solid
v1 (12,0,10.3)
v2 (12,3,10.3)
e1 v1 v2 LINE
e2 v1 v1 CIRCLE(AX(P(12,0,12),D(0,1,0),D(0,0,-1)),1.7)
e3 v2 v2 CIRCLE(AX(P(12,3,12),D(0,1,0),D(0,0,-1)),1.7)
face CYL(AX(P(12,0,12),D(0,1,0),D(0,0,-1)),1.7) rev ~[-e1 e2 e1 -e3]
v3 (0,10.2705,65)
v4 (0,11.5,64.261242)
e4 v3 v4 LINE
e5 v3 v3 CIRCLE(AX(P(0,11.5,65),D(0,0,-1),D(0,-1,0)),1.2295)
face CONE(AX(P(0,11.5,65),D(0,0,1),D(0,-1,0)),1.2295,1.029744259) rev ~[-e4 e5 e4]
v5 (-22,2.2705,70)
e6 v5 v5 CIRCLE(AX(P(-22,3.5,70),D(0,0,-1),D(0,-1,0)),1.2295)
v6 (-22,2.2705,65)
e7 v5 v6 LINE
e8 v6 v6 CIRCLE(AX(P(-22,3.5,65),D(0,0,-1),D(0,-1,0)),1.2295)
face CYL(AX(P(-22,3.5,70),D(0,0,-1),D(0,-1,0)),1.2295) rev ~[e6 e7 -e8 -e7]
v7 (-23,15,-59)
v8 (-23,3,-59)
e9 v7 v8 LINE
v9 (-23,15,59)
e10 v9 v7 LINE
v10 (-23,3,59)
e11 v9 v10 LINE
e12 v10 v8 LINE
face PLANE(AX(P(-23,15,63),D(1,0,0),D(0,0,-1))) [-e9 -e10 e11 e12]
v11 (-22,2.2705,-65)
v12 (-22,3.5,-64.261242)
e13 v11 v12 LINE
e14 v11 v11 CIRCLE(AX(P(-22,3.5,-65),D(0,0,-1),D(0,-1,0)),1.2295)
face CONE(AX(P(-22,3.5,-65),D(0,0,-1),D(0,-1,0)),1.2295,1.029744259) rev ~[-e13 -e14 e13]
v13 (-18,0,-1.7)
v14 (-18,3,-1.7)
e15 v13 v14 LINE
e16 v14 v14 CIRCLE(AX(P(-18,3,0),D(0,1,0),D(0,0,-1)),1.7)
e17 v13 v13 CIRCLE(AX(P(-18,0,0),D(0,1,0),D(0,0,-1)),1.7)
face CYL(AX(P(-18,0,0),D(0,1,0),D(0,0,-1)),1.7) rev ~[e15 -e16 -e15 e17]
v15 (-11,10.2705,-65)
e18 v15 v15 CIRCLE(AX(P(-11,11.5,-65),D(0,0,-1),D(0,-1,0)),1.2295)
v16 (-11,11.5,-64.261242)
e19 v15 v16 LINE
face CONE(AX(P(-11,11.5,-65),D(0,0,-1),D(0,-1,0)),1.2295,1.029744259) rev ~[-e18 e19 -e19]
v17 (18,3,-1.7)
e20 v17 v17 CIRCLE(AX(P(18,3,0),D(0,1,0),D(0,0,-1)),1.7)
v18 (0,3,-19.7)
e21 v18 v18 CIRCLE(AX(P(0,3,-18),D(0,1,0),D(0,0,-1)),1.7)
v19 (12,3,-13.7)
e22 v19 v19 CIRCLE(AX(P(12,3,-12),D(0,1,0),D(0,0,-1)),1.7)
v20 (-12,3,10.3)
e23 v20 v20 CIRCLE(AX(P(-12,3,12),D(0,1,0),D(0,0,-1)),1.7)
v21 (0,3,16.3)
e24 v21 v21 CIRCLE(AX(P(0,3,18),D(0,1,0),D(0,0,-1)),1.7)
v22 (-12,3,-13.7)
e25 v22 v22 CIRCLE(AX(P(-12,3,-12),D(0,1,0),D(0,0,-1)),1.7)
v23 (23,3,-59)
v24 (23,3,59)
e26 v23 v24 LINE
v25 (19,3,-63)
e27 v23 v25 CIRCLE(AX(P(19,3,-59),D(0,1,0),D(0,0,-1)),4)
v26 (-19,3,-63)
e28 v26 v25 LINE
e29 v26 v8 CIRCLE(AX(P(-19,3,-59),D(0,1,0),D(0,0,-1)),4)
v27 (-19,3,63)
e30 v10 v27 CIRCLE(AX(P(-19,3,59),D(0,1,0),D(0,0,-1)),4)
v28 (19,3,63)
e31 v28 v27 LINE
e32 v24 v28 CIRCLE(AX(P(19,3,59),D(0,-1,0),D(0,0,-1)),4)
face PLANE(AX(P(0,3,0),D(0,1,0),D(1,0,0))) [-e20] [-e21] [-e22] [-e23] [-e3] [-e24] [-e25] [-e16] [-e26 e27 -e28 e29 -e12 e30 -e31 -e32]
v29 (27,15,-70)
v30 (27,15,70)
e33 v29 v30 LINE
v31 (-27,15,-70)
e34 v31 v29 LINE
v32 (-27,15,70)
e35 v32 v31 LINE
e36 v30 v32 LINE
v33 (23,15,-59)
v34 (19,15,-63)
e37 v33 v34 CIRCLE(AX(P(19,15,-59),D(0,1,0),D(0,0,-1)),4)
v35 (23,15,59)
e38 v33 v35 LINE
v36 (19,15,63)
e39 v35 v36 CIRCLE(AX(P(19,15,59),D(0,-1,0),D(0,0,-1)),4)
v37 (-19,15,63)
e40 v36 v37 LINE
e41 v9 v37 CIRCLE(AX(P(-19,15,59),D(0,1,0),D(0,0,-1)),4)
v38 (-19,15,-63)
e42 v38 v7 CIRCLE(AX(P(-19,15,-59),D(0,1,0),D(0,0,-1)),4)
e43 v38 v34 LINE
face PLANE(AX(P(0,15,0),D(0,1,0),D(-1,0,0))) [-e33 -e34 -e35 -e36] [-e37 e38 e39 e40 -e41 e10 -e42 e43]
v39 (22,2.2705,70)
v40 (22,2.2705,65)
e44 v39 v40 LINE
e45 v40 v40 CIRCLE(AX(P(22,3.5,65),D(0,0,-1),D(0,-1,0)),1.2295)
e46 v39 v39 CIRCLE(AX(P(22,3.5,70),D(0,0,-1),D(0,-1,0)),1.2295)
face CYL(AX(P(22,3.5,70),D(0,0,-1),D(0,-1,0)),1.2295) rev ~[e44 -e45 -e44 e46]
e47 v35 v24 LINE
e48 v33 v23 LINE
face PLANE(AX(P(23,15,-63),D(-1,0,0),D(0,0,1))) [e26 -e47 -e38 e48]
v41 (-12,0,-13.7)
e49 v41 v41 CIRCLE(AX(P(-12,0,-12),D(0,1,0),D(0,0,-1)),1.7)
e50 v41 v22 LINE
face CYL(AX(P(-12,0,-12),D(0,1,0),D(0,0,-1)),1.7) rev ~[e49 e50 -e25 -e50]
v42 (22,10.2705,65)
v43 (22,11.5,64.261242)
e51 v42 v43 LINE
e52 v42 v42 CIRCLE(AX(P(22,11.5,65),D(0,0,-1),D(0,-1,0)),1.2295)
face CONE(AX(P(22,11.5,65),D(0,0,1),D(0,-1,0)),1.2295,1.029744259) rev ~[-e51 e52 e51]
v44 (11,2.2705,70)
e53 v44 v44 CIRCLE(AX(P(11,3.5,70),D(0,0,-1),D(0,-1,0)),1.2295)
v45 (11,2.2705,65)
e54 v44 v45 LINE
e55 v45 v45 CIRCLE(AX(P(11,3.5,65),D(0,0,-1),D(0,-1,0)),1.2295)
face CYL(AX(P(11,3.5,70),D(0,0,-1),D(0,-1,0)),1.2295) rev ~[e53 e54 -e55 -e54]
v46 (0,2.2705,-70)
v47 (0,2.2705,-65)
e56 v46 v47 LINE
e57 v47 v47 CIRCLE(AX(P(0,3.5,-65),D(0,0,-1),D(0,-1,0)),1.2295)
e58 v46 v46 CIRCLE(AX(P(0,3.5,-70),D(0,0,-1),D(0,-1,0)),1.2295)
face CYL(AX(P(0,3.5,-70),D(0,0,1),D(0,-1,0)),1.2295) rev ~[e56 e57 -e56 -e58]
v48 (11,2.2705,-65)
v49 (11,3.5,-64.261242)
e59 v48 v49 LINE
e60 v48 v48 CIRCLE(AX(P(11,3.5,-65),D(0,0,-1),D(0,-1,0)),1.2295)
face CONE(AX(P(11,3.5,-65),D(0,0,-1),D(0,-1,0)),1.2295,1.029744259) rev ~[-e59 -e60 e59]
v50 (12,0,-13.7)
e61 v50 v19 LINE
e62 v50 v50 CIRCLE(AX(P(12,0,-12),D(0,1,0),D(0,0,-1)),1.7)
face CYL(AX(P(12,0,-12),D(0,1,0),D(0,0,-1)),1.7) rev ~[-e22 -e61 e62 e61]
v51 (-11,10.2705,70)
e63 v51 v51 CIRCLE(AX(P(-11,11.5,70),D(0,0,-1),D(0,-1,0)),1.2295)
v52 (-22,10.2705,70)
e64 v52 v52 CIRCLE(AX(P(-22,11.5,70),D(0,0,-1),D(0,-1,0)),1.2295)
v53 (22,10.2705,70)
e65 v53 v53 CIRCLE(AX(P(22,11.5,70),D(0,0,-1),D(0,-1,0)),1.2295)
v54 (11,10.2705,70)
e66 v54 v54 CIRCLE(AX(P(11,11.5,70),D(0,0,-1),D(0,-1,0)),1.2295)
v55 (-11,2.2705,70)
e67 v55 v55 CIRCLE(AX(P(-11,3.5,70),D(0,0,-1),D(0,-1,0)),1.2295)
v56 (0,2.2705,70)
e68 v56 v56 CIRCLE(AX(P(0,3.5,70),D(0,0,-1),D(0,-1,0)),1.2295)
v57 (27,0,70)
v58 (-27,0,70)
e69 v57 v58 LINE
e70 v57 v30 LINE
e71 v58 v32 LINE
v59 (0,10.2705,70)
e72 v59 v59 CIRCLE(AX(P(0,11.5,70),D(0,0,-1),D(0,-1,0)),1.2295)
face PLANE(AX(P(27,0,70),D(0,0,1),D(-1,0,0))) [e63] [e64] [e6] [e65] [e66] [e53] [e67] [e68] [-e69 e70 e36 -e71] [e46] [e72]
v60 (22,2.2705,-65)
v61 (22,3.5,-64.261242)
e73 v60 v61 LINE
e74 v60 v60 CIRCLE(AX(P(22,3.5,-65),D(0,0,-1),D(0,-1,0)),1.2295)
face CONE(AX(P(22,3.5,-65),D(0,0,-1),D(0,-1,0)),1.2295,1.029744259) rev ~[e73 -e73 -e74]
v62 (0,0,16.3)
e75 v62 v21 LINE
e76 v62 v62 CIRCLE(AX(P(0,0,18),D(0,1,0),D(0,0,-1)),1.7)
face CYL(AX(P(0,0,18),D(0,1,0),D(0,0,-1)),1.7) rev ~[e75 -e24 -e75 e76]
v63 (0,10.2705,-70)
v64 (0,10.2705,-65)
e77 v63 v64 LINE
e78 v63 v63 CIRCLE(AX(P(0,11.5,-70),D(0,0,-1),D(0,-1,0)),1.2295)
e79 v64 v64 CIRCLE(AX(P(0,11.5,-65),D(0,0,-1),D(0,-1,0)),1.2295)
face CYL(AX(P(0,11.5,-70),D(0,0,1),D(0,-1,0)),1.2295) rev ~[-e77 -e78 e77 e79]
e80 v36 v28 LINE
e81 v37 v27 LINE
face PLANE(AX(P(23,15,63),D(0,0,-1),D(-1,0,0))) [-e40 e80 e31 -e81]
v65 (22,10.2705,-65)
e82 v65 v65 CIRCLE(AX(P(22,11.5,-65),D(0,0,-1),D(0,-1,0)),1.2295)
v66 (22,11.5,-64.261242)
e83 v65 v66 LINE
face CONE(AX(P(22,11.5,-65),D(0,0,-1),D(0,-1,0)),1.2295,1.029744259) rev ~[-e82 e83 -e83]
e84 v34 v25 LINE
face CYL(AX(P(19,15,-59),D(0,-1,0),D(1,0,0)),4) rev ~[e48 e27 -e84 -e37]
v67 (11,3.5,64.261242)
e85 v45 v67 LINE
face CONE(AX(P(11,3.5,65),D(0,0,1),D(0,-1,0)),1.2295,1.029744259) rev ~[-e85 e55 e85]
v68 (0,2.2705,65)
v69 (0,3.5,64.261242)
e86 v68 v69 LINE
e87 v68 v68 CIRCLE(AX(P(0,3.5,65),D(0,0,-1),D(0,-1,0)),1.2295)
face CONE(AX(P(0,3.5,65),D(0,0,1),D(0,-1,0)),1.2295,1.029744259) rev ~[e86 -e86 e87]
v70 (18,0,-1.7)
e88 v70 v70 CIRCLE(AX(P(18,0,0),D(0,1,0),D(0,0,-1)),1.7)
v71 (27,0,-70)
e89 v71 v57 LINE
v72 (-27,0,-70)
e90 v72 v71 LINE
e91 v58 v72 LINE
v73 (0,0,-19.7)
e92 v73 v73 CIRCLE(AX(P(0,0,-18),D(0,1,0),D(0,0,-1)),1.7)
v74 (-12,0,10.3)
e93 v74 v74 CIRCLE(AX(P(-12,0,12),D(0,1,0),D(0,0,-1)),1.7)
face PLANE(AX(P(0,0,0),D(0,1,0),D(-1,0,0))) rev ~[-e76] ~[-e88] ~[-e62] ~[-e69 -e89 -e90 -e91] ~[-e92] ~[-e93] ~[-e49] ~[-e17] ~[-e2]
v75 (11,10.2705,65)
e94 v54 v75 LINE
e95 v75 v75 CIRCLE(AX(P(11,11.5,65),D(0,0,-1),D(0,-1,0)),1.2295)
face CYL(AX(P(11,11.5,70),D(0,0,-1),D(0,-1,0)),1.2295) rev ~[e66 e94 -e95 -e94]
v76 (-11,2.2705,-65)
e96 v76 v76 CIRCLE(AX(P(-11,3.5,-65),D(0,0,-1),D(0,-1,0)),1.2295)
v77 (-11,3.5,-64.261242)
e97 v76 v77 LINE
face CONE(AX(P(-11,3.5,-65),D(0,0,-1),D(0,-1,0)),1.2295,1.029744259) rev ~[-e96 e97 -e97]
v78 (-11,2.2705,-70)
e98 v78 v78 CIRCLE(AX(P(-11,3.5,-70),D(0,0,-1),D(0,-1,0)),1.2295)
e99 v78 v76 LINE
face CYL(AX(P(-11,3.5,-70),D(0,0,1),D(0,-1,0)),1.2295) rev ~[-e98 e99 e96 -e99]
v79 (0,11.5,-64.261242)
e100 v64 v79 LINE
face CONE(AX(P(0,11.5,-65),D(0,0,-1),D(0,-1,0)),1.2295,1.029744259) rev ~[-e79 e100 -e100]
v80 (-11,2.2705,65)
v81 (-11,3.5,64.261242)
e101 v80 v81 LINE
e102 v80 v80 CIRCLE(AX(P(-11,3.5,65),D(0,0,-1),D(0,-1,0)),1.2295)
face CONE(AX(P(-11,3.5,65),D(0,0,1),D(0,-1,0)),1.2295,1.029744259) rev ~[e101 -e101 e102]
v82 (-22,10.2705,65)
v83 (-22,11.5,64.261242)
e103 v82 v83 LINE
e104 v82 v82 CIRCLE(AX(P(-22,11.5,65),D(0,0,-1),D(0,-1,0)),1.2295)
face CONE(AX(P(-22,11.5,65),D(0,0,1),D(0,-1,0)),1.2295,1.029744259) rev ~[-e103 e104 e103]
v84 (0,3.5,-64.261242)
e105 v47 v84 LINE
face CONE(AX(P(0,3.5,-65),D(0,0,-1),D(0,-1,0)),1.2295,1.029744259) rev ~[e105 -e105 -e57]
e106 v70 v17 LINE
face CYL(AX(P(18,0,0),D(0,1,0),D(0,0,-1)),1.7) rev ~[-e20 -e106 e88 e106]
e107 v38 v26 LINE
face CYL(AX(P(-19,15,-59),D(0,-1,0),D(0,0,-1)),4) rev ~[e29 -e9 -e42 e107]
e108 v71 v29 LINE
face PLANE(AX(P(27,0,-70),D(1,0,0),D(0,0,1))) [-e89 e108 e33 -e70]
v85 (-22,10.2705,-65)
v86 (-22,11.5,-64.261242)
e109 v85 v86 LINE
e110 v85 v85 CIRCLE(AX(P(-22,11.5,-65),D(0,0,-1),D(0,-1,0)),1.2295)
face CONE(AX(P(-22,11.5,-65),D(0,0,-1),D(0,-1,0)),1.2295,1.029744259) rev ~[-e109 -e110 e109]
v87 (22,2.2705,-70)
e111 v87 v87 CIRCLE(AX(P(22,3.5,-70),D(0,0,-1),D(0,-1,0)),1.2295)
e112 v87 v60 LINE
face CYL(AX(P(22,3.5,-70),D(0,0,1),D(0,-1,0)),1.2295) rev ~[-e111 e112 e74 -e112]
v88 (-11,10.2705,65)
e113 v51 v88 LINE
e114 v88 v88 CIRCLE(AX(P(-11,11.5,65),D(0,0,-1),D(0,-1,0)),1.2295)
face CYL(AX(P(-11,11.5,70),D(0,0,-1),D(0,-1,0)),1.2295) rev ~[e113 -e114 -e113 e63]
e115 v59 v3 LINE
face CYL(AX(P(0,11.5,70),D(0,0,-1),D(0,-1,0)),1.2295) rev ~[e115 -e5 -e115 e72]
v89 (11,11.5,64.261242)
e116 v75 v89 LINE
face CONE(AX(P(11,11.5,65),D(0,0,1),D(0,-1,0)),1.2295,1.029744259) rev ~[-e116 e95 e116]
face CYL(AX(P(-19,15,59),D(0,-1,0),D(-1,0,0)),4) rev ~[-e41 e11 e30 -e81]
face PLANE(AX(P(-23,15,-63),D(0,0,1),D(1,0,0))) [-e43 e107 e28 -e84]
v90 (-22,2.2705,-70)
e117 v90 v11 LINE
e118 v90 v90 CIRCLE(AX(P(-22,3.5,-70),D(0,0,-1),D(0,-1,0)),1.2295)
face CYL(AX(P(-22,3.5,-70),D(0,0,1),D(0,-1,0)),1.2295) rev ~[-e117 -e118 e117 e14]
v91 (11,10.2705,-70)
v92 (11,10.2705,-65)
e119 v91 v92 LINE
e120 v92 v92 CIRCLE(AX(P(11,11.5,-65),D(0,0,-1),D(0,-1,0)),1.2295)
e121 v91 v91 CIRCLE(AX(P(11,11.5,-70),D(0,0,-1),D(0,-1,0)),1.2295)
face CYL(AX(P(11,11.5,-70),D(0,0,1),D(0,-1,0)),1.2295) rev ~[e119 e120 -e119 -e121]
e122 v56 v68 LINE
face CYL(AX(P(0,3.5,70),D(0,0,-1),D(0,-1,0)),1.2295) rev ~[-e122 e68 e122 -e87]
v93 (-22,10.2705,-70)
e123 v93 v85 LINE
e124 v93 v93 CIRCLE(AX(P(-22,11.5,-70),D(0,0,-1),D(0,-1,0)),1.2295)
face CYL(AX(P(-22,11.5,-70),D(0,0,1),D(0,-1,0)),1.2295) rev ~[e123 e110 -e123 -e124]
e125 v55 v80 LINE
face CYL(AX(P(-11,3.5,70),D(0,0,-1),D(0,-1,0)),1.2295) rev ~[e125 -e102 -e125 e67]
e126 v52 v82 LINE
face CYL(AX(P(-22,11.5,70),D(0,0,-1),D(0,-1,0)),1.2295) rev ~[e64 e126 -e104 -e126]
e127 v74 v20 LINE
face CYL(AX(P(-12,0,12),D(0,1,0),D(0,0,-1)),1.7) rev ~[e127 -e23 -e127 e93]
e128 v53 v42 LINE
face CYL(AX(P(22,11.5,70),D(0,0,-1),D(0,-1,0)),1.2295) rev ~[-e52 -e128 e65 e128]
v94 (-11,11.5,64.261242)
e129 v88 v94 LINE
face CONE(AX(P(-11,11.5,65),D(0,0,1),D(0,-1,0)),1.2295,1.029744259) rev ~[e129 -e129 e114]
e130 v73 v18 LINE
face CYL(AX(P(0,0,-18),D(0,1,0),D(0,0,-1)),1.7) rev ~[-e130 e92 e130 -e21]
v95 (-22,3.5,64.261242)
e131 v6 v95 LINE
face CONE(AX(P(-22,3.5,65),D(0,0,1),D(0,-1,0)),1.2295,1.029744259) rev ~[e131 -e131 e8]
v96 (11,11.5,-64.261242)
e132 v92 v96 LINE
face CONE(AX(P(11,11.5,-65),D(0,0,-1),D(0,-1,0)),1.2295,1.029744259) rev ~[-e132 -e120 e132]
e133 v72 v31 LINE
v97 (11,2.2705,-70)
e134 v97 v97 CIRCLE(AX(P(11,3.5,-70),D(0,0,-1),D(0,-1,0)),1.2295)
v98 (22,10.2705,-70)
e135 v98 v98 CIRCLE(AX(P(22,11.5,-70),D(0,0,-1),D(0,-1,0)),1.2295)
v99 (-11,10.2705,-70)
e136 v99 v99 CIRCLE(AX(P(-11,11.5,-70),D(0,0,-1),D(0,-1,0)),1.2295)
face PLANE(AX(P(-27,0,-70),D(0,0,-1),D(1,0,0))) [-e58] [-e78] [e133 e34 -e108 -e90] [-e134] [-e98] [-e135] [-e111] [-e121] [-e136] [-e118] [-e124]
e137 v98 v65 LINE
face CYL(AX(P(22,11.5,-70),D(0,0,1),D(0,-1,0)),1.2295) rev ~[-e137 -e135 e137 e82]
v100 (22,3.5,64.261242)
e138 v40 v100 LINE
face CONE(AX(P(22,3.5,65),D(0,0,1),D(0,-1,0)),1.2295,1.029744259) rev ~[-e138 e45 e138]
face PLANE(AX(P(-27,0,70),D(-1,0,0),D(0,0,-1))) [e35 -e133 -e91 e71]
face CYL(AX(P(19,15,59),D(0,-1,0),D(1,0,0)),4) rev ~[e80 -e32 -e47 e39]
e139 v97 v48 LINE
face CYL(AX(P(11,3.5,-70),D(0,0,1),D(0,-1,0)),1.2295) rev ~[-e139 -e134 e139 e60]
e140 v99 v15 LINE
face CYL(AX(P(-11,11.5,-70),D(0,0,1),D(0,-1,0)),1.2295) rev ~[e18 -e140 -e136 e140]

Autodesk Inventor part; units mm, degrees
ref_plane "YZ Plane" through (0, 0, 0) normal (1, 0, 0) x (0, 1, 0)
ref_plane "XZ Plane" through (0, 0, 0) normal (0, 1, 0) x (-1, 0, 0)
ref_plane "XY Plane" through (0, 0, 0) normal (0, 0, 1) x (1, 0, 0)
sketch "Skizze1" plane through (0, 0, 0) normal (0, 1, 0) x (-1, 0, 0)
  line L0 (-27, 70) -> (27, 70)
  line L1 (27, 70) -> (27, -70)
  line L2 (27, -70) -> (-27, -70)
  line L3 (-27, -70) -> (-27, 70)
  line L4 (-27, 70) -> (27, -70) construction
  line L5 (27, 70) -> (-27, -70) construction
  point P0 (0, 0)
  dimension "d0" = 54
  dimension "d1" = 140
extrude "Extrusion1" add sketch "Skizze1" along normal blind 15
sketch "Skizze2" plane through (0, 15, 0) normal (0, 1, 0) x (1, 0, 0)
  line L0 (23, -63) -> (-23, -63)
  line L1 (-23, -63) -> (-23, 63)
  line L2 (-23, 63) -> (23, 63)
  line L3 (23, 63) -> (23, -63)
  line L4 (23, -63) -> (-23, 63) construction
  line L5 (-23, -63) -> (23, 63) construction
  line L6 (-27, -70) -> (27, -70) projected
  line L7 (27, -70) -> (27, 70) projected
  line L8 (27, 70) -> (-27, 70) projected
  line L9 (-27, 70) -> (-27, -70) projected
  point P0 (0, 0)
  dimension "d4" = 4
  dimension "d7" = 7
extrude "Extrusion2" cut sketch "Skizze2" against normal blind 12 contours L0 L1 L2 L3
sketch "Skizze4" plane through (-27, 0, 70) normal (0, 0, 1) x (1, 0, 0)
  line L0 (54, 0) -> (0, 0) projected
  line L1 (54, 0) -> (54, 15) projected
  line L2 (0, 15) -> (54, 15) projected
  line L3 (0, 0) -> (0, 15) projected
  point P0 (27, 3.5)
  dimension "d23" = 3.5
hole "Bohrung1" at (0, 3.5, 70) direction (0, 0, -1) diameter 2.459 depth 5 tip angle 118 thread size "M3x0.5" class "6H" standard "ISO Metric profile"
pattern_linear "Rechteckige Anordnung1" count 5 spacing 11 along (-1, 0, 0) count 2 spacing 8 along (0, 1, 0) of "Bohrung1" first direction both ways yes
mirror "Spiegeln1" about plane through (0, 0, 0) normal (0, 0, 1) of "Extrusion2", "Bohrung1", "Rechteckige Anordnung1"
sketch "Skizze6" plane through (0, 0, 0) normal (0, -1, 0) x (1, 0, 0)
  line L0 (-18, 18) -> (18, 18)
  line L1 (18, 18) -> (18, -18)
  line L2 (18, -18) -> (-18, -18)
  line L3 (-18, -18) -> (-18, 18)
  line L4 (-18, 18) -> (18, -18) construction
  line L5 (18, 18) -> (-18, -18) construction
  line L6 (0, 18) -> (0, -18) construction
  line L7 (-18, 0) -> (18, 0) construction
  line L8 (-12, 12) -> (12, 12)
  line L9 (12, 12) -> (12, -12)
  line L10 (12, -12) -> (-12, -12)
  line L11 (-12, -12) -> (-12, 12)
  line L12 (-12, 12) -> (12, -12) construction
  line L13 (12, 12) -> (-12, -12) construction
  point P0 (0, 0)
  dimension "d47" = 36
  dimension "d48" = 36
  dimension "d57" = 24
  dimension "d58" = 24
hole "Bohrung2" at (18, 0, 0) at (0, 0, -18) at (-18, 0, 0) at (0, 0, 18) at (12, 0, -12) at (12, 0, 12) at (-12, 0, 12) at (-12, 0, -12) direction (0, 1, 0) diameter 3.4 end through all clearance for "Inbusschraube ISO 4762" size "M3" standard "ISO"
fillet "Rundung2" radius 4 4 edges at (-23, 9, -63) (23, 9, -63) (23, 9, 63) (-23, 9, 63)
hole "Bohrung3" [suppressed]
properties part number "dynamixel_pro_frame_part1" material "Aluminium 6061"
